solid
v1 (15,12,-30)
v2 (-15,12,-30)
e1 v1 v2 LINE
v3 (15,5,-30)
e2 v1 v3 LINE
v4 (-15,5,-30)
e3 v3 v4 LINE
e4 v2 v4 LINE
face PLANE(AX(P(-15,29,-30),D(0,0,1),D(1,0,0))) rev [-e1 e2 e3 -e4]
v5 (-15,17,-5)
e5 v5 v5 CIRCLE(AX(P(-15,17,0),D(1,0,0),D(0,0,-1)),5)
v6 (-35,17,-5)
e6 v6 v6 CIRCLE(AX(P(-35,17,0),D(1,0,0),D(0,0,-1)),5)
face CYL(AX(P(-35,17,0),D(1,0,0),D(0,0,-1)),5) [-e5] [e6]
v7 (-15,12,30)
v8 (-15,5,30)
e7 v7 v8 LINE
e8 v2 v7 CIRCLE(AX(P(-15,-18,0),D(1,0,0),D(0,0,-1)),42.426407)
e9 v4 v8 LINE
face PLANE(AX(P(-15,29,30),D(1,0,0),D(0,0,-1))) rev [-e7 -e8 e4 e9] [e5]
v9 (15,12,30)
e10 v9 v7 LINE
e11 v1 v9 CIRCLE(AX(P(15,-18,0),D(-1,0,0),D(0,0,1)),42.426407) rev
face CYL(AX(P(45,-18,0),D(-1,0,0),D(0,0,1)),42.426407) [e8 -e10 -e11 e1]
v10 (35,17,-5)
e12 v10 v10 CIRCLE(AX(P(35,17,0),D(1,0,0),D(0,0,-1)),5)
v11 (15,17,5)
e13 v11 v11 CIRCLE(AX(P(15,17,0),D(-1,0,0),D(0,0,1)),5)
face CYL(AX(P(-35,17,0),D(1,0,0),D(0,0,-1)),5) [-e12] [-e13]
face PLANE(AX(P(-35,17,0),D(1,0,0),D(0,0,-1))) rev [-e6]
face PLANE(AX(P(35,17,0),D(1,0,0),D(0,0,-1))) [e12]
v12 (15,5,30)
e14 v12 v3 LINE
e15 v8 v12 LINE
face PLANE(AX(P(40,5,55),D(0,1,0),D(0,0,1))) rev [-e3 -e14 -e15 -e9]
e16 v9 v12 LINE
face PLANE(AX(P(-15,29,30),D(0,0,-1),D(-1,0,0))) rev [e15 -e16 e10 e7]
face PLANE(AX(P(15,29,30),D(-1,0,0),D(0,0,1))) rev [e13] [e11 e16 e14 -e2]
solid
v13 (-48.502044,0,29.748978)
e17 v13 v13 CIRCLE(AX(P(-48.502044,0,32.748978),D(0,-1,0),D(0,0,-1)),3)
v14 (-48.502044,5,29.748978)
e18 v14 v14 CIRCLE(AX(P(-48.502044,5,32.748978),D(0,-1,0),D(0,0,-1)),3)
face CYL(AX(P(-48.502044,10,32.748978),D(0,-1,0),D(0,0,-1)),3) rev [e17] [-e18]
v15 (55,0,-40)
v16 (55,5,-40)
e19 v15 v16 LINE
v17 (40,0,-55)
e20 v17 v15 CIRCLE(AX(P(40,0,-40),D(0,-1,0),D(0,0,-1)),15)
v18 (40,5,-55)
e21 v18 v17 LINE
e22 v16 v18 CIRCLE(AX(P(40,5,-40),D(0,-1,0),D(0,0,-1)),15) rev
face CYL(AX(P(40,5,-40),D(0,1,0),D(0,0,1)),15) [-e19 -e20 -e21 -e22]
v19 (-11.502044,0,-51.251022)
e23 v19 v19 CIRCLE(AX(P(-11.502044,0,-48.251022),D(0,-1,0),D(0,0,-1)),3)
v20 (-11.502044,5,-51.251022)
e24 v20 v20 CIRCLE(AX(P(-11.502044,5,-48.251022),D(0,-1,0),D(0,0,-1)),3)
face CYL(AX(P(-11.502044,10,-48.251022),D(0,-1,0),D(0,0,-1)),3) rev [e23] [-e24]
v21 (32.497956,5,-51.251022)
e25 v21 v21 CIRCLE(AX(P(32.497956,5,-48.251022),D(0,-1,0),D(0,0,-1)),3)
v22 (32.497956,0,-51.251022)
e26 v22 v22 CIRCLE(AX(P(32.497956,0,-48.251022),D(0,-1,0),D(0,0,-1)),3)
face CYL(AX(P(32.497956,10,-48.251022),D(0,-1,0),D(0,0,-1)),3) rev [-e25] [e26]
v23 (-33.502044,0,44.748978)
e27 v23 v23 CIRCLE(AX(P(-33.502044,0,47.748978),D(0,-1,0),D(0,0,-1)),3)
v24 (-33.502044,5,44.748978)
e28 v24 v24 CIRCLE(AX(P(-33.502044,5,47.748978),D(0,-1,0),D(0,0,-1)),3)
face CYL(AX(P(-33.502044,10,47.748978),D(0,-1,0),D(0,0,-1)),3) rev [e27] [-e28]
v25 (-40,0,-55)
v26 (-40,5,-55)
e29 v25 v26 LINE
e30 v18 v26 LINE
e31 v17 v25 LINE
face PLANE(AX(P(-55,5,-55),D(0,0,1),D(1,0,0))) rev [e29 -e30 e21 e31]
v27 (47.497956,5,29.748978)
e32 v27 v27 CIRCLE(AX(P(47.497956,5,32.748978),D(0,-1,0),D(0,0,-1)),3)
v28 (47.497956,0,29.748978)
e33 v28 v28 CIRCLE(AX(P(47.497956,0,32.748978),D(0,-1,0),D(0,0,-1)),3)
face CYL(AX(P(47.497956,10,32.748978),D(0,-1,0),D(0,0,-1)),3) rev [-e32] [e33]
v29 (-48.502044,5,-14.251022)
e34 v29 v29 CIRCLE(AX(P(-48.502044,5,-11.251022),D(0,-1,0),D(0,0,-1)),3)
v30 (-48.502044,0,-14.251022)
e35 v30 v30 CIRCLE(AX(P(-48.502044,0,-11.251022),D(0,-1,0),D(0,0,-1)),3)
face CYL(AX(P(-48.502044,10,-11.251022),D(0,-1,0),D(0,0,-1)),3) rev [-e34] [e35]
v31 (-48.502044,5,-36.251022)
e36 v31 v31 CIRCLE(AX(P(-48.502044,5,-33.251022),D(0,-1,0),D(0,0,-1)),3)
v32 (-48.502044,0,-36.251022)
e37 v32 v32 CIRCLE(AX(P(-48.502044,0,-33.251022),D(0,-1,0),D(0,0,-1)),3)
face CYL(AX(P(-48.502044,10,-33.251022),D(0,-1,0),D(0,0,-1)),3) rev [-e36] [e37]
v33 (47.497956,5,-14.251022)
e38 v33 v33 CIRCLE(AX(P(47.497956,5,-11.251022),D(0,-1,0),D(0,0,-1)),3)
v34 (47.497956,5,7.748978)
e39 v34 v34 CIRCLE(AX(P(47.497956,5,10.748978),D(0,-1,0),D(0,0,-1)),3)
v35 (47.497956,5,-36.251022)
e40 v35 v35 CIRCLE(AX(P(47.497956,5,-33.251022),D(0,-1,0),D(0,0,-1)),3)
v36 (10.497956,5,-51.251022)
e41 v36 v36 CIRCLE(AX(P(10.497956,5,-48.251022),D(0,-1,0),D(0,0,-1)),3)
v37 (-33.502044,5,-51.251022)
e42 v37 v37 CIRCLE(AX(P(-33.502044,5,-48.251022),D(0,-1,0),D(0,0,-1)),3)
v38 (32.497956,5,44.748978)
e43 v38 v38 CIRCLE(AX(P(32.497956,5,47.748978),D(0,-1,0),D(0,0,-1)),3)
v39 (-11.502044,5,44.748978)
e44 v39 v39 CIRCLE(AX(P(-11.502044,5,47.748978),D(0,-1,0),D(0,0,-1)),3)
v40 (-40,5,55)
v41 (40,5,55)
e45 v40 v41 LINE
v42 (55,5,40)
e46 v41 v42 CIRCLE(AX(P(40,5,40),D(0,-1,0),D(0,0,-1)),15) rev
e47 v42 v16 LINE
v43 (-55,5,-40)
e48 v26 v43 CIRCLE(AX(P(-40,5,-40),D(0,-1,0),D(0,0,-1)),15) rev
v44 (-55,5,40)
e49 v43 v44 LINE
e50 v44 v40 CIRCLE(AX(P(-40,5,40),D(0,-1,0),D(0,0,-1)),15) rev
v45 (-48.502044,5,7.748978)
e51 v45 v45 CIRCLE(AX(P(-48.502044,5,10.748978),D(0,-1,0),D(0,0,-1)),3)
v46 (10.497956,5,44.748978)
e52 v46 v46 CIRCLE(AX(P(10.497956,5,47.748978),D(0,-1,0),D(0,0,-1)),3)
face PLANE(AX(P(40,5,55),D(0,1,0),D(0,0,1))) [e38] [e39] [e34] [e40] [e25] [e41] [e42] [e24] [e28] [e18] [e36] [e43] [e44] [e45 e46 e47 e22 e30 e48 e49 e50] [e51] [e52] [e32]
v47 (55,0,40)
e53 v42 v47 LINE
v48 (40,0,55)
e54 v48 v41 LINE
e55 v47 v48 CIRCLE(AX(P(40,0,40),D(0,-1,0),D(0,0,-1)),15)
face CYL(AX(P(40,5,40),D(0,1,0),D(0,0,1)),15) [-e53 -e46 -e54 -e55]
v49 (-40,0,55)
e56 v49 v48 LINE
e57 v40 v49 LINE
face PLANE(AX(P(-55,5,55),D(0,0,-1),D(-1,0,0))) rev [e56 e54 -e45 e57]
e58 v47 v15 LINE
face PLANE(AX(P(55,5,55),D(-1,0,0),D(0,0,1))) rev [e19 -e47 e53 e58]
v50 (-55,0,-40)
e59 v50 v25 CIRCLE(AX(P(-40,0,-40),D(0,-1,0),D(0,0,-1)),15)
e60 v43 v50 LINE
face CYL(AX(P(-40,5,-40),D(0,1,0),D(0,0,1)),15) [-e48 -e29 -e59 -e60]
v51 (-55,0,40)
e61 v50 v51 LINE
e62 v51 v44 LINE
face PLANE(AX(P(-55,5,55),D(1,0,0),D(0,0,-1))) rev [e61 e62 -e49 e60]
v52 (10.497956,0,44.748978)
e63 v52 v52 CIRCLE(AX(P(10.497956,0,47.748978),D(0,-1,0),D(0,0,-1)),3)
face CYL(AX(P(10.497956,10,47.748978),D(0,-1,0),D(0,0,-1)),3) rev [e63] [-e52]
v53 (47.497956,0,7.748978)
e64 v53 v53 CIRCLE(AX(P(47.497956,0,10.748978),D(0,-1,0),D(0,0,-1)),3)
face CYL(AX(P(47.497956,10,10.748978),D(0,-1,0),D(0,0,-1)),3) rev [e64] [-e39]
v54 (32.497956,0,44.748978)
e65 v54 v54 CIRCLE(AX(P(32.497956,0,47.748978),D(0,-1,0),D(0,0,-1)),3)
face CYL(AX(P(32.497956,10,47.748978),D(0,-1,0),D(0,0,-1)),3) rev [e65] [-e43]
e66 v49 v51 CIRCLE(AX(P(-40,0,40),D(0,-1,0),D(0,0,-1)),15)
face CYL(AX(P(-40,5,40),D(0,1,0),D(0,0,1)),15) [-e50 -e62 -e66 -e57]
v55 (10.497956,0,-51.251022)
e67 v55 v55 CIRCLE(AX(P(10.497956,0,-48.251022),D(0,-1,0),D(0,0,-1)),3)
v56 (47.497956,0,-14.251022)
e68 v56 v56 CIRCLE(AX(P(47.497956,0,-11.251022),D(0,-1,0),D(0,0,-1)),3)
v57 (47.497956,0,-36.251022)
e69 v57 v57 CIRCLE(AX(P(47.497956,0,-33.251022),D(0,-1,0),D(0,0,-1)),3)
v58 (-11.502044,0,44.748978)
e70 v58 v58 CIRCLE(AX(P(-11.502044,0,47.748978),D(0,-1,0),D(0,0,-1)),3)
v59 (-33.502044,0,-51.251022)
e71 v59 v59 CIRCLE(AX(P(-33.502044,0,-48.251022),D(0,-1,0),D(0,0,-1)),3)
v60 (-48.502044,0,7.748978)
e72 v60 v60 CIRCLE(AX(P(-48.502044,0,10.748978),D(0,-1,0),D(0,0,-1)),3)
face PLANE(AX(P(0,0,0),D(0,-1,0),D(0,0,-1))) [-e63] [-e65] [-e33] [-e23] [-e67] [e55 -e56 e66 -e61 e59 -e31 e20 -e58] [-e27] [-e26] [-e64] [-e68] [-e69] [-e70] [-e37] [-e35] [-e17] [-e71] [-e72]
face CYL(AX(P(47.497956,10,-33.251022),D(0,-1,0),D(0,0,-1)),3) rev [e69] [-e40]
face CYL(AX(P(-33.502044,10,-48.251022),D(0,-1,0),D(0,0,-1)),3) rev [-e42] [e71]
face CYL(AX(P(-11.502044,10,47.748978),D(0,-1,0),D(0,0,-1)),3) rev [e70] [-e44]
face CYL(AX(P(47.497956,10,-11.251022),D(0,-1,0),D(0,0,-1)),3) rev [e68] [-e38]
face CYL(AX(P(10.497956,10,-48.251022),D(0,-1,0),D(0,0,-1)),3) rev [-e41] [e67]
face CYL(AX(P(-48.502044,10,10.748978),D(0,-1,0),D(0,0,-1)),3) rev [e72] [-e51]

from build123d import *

# Parameters (mm, degrees)
SKETCH1_W                = 110
SKETCH1_H                = 110
BOSS_EXTRUDE1_DEPTH      = 5
FILLET2_R                = 15
FILLET3_R                = 15
FILLET4_R                = 15
FILLET5_R                = 15
SKETCH2_W                = 30
SKETCH2_H                = 60
BOSS_EXTRUDE2_DEPTH      = 24
BOSS_EXTRUDE3_DEPTH      = 20
BOSS_EXTRUDE3_DEPTH_BACK = 50
SKETCH4_R                = 5
FILLET6_R                = 10
FILLET7_R                = 10
SKETCH5_R                = 3
CUT_EXTRUDE2_DEPTH       = 10
CUT_EXTRUDE3_DEPTH       = 60


with BuildPart() as part:
    # Sketch1 → Boss-Extrude1 (new body)
    with BuildSketch(Plane(origin=(0, 0, 0), x_dir=(1, 0, 0), z_dir=(0, 1, 0))):
        Rectangle(SKETCH1_W, SKETCH1_H)
    extrude(amount=BOSS_EXTRUDE1_DEPTH)

    # Fillet2
    fillet2_edges = [part.edges().sort_by_distance(p)[0] for p in [
        (55, 2.5, -55),
    ]]
    fillet(fillet2_edges, radius=FILLET2_R)

    # Fillet3
    fillet3_edges = [part.edges().sort_by_distance(p)[0] for p in [
        (-55, 2.5, -55),
    ]]
    fillet(fillet3_edges, radius=FILLET3_R)

    # Fillet4
    fillet4_edges = [part.edges().sort_by_distance(p)[0] for p in [
        (-55, 2.5, 55),
    ]]
    fillet(fillet4_edges, radius=FILLET4_R)

    # Fillet5
    fillet5_edges = [part.edges().sort_by_distance(p)[0] for p in [
        (55, 2.5, 55),
    ]]
    fillet(fillet5_edges, radius=FILLET5_R)

    # Sketch2 → Boss-Extrude2 (add)
    with BuildSketch(Plane(origin=(0, 5, 0), x_dir=(1, 0, 0), z_dir=(0, 1, 0))):
        Rectangle(SKETCH2_W, SKETCH2_H)
    extrude(amount=BOSS_EXTRUDE2_DEPTH)

    # Sketch4 → Boss-Extrude3 (add, two sides: drawn at the far end of the back side and taken through both)
    with BuildSketch(Plane(origin=(15, 0, 0), x_dir=(0, 0, -1), z_dir=(1, 0, 0)).offset(-BOSS_EXTRUDE3_DEPTH_BACK)):
        with Locations((0, 17)):
            Circle(SKETCH4_R)
    extrude(amount=BOSS_EXTRUDE3_DEPTH + BOSS_EXTRUDE3_DEPTH_BACK)

    # Fillet6
    fillet6_edges = [part.edges().sort_by_distance(p)[0] for p in [
        (0, 29, 30),
    ]]
    fillet(fillet6_edges, radius=FILLET6_R)

    # Fillet7
    fillet7_edges = [part.edges().sort_by_distance(p)[0] for p in [
        (0, 29, -30),
    ]]
    fillet(fillet7_edges, radius=FILLET7_R)

    # Sketch5 → Cut-Extrude2 (cut)
    with BuildSketch(Plane.XZ):
        with Locations((47.497955542, -11.251022229)):
            Circle(SKETCH5_R)
        with Locations((47.497955542, 32.748977771)):
            Circle(SKETCH5_R)
        with Locations((-48.502044458, 10.748977771)):
            Circle(SKETCH5_R)
        with Locations((-48.502044458, -11.251022229)):
            Circle(SKETCH5_R)
        with Locations((-48.502044458, -33.251022229)):
            Circle(SKETCH5_R)
        with Locations((-33.502044458, -48.251022229)):
            Circle(SKETCH5_R)
        with Locations((-11.502044458, -48.251022229)):
            Circle(SKETCH5_R)
        with Locations((10.497955542, -48.251022229)):
            Circle(SKETCH5_R)
        with Locations((32.497955542, -48.251022229)):
            Circle(SKETCH5_R)
        with Locations((47.497955542, -33.251022229)):
            Circle(SKETCH5_R)
        with Locations((47.497955542, 10.748977771)):
            Circle(SKETCH5_R)
        with Locations((32.497955542, 47.748977771)):
            Circle(SKETCH5_R)
        with Locations((10.497955542, 47.748977771)):
            Circle(SKETCH5_R)
        with Locations((-11.502044458, 47.748977771)):
            Circle(SKETCH5_R)
        with Locations((-33.502044458, 47.748977771)):
            Circle(SKETCH5_R)
        with Locations((-48.502044458, 32.748977771)):
            Circle(SKETCH5_R)
    extrude(amount=-CUT_EXTRUDE2_DEPTH, mode=Mode.SUBTRACT)

    # Sketch8 → Cut-Extrude3 (cut)
    with BuildSketch(Plane.ZY.offset(15)):
        with BuildLine():
            Line((-30, 19), (-30, 12))
            ThreePointArc((-30, 12), (0, 24.426406871), (30, 12))
            Line((30, 12), (30, 19))
            ThreePointArc((30, 19), (27.071067812, 26.071067812), (20, 29))
            Line((20, 29), (-20, 29))
            ThreePointArc((-20, 29), (-27.071067812, 26.071067812), (-30, 19))
        make_face()
    extrude(amount=-CUT_EXTRUDE3_DEPTH, mode=Mode.SUBTRACT)


with BuildPart() as body_2:
    # Split1: the piece on the far side of the plane
    add(part.part)
    split(bisect_by=Plane(origin=(0, 5, 0), x_dir=(0, 0, -1), z_dir=(0, -1, 0)), keep=Keep.BOTTOM)


with BuildPart() as part_1:
    add(part.part)

    # Split1
    split(bisect_by=Plane(origin=(0, 5, 0), x_dir=(0, 0, -1), z_dir=(0, -1, 0)), keep=Keep.TOP)


solid = Compound([body_2.part, part_1.part])
